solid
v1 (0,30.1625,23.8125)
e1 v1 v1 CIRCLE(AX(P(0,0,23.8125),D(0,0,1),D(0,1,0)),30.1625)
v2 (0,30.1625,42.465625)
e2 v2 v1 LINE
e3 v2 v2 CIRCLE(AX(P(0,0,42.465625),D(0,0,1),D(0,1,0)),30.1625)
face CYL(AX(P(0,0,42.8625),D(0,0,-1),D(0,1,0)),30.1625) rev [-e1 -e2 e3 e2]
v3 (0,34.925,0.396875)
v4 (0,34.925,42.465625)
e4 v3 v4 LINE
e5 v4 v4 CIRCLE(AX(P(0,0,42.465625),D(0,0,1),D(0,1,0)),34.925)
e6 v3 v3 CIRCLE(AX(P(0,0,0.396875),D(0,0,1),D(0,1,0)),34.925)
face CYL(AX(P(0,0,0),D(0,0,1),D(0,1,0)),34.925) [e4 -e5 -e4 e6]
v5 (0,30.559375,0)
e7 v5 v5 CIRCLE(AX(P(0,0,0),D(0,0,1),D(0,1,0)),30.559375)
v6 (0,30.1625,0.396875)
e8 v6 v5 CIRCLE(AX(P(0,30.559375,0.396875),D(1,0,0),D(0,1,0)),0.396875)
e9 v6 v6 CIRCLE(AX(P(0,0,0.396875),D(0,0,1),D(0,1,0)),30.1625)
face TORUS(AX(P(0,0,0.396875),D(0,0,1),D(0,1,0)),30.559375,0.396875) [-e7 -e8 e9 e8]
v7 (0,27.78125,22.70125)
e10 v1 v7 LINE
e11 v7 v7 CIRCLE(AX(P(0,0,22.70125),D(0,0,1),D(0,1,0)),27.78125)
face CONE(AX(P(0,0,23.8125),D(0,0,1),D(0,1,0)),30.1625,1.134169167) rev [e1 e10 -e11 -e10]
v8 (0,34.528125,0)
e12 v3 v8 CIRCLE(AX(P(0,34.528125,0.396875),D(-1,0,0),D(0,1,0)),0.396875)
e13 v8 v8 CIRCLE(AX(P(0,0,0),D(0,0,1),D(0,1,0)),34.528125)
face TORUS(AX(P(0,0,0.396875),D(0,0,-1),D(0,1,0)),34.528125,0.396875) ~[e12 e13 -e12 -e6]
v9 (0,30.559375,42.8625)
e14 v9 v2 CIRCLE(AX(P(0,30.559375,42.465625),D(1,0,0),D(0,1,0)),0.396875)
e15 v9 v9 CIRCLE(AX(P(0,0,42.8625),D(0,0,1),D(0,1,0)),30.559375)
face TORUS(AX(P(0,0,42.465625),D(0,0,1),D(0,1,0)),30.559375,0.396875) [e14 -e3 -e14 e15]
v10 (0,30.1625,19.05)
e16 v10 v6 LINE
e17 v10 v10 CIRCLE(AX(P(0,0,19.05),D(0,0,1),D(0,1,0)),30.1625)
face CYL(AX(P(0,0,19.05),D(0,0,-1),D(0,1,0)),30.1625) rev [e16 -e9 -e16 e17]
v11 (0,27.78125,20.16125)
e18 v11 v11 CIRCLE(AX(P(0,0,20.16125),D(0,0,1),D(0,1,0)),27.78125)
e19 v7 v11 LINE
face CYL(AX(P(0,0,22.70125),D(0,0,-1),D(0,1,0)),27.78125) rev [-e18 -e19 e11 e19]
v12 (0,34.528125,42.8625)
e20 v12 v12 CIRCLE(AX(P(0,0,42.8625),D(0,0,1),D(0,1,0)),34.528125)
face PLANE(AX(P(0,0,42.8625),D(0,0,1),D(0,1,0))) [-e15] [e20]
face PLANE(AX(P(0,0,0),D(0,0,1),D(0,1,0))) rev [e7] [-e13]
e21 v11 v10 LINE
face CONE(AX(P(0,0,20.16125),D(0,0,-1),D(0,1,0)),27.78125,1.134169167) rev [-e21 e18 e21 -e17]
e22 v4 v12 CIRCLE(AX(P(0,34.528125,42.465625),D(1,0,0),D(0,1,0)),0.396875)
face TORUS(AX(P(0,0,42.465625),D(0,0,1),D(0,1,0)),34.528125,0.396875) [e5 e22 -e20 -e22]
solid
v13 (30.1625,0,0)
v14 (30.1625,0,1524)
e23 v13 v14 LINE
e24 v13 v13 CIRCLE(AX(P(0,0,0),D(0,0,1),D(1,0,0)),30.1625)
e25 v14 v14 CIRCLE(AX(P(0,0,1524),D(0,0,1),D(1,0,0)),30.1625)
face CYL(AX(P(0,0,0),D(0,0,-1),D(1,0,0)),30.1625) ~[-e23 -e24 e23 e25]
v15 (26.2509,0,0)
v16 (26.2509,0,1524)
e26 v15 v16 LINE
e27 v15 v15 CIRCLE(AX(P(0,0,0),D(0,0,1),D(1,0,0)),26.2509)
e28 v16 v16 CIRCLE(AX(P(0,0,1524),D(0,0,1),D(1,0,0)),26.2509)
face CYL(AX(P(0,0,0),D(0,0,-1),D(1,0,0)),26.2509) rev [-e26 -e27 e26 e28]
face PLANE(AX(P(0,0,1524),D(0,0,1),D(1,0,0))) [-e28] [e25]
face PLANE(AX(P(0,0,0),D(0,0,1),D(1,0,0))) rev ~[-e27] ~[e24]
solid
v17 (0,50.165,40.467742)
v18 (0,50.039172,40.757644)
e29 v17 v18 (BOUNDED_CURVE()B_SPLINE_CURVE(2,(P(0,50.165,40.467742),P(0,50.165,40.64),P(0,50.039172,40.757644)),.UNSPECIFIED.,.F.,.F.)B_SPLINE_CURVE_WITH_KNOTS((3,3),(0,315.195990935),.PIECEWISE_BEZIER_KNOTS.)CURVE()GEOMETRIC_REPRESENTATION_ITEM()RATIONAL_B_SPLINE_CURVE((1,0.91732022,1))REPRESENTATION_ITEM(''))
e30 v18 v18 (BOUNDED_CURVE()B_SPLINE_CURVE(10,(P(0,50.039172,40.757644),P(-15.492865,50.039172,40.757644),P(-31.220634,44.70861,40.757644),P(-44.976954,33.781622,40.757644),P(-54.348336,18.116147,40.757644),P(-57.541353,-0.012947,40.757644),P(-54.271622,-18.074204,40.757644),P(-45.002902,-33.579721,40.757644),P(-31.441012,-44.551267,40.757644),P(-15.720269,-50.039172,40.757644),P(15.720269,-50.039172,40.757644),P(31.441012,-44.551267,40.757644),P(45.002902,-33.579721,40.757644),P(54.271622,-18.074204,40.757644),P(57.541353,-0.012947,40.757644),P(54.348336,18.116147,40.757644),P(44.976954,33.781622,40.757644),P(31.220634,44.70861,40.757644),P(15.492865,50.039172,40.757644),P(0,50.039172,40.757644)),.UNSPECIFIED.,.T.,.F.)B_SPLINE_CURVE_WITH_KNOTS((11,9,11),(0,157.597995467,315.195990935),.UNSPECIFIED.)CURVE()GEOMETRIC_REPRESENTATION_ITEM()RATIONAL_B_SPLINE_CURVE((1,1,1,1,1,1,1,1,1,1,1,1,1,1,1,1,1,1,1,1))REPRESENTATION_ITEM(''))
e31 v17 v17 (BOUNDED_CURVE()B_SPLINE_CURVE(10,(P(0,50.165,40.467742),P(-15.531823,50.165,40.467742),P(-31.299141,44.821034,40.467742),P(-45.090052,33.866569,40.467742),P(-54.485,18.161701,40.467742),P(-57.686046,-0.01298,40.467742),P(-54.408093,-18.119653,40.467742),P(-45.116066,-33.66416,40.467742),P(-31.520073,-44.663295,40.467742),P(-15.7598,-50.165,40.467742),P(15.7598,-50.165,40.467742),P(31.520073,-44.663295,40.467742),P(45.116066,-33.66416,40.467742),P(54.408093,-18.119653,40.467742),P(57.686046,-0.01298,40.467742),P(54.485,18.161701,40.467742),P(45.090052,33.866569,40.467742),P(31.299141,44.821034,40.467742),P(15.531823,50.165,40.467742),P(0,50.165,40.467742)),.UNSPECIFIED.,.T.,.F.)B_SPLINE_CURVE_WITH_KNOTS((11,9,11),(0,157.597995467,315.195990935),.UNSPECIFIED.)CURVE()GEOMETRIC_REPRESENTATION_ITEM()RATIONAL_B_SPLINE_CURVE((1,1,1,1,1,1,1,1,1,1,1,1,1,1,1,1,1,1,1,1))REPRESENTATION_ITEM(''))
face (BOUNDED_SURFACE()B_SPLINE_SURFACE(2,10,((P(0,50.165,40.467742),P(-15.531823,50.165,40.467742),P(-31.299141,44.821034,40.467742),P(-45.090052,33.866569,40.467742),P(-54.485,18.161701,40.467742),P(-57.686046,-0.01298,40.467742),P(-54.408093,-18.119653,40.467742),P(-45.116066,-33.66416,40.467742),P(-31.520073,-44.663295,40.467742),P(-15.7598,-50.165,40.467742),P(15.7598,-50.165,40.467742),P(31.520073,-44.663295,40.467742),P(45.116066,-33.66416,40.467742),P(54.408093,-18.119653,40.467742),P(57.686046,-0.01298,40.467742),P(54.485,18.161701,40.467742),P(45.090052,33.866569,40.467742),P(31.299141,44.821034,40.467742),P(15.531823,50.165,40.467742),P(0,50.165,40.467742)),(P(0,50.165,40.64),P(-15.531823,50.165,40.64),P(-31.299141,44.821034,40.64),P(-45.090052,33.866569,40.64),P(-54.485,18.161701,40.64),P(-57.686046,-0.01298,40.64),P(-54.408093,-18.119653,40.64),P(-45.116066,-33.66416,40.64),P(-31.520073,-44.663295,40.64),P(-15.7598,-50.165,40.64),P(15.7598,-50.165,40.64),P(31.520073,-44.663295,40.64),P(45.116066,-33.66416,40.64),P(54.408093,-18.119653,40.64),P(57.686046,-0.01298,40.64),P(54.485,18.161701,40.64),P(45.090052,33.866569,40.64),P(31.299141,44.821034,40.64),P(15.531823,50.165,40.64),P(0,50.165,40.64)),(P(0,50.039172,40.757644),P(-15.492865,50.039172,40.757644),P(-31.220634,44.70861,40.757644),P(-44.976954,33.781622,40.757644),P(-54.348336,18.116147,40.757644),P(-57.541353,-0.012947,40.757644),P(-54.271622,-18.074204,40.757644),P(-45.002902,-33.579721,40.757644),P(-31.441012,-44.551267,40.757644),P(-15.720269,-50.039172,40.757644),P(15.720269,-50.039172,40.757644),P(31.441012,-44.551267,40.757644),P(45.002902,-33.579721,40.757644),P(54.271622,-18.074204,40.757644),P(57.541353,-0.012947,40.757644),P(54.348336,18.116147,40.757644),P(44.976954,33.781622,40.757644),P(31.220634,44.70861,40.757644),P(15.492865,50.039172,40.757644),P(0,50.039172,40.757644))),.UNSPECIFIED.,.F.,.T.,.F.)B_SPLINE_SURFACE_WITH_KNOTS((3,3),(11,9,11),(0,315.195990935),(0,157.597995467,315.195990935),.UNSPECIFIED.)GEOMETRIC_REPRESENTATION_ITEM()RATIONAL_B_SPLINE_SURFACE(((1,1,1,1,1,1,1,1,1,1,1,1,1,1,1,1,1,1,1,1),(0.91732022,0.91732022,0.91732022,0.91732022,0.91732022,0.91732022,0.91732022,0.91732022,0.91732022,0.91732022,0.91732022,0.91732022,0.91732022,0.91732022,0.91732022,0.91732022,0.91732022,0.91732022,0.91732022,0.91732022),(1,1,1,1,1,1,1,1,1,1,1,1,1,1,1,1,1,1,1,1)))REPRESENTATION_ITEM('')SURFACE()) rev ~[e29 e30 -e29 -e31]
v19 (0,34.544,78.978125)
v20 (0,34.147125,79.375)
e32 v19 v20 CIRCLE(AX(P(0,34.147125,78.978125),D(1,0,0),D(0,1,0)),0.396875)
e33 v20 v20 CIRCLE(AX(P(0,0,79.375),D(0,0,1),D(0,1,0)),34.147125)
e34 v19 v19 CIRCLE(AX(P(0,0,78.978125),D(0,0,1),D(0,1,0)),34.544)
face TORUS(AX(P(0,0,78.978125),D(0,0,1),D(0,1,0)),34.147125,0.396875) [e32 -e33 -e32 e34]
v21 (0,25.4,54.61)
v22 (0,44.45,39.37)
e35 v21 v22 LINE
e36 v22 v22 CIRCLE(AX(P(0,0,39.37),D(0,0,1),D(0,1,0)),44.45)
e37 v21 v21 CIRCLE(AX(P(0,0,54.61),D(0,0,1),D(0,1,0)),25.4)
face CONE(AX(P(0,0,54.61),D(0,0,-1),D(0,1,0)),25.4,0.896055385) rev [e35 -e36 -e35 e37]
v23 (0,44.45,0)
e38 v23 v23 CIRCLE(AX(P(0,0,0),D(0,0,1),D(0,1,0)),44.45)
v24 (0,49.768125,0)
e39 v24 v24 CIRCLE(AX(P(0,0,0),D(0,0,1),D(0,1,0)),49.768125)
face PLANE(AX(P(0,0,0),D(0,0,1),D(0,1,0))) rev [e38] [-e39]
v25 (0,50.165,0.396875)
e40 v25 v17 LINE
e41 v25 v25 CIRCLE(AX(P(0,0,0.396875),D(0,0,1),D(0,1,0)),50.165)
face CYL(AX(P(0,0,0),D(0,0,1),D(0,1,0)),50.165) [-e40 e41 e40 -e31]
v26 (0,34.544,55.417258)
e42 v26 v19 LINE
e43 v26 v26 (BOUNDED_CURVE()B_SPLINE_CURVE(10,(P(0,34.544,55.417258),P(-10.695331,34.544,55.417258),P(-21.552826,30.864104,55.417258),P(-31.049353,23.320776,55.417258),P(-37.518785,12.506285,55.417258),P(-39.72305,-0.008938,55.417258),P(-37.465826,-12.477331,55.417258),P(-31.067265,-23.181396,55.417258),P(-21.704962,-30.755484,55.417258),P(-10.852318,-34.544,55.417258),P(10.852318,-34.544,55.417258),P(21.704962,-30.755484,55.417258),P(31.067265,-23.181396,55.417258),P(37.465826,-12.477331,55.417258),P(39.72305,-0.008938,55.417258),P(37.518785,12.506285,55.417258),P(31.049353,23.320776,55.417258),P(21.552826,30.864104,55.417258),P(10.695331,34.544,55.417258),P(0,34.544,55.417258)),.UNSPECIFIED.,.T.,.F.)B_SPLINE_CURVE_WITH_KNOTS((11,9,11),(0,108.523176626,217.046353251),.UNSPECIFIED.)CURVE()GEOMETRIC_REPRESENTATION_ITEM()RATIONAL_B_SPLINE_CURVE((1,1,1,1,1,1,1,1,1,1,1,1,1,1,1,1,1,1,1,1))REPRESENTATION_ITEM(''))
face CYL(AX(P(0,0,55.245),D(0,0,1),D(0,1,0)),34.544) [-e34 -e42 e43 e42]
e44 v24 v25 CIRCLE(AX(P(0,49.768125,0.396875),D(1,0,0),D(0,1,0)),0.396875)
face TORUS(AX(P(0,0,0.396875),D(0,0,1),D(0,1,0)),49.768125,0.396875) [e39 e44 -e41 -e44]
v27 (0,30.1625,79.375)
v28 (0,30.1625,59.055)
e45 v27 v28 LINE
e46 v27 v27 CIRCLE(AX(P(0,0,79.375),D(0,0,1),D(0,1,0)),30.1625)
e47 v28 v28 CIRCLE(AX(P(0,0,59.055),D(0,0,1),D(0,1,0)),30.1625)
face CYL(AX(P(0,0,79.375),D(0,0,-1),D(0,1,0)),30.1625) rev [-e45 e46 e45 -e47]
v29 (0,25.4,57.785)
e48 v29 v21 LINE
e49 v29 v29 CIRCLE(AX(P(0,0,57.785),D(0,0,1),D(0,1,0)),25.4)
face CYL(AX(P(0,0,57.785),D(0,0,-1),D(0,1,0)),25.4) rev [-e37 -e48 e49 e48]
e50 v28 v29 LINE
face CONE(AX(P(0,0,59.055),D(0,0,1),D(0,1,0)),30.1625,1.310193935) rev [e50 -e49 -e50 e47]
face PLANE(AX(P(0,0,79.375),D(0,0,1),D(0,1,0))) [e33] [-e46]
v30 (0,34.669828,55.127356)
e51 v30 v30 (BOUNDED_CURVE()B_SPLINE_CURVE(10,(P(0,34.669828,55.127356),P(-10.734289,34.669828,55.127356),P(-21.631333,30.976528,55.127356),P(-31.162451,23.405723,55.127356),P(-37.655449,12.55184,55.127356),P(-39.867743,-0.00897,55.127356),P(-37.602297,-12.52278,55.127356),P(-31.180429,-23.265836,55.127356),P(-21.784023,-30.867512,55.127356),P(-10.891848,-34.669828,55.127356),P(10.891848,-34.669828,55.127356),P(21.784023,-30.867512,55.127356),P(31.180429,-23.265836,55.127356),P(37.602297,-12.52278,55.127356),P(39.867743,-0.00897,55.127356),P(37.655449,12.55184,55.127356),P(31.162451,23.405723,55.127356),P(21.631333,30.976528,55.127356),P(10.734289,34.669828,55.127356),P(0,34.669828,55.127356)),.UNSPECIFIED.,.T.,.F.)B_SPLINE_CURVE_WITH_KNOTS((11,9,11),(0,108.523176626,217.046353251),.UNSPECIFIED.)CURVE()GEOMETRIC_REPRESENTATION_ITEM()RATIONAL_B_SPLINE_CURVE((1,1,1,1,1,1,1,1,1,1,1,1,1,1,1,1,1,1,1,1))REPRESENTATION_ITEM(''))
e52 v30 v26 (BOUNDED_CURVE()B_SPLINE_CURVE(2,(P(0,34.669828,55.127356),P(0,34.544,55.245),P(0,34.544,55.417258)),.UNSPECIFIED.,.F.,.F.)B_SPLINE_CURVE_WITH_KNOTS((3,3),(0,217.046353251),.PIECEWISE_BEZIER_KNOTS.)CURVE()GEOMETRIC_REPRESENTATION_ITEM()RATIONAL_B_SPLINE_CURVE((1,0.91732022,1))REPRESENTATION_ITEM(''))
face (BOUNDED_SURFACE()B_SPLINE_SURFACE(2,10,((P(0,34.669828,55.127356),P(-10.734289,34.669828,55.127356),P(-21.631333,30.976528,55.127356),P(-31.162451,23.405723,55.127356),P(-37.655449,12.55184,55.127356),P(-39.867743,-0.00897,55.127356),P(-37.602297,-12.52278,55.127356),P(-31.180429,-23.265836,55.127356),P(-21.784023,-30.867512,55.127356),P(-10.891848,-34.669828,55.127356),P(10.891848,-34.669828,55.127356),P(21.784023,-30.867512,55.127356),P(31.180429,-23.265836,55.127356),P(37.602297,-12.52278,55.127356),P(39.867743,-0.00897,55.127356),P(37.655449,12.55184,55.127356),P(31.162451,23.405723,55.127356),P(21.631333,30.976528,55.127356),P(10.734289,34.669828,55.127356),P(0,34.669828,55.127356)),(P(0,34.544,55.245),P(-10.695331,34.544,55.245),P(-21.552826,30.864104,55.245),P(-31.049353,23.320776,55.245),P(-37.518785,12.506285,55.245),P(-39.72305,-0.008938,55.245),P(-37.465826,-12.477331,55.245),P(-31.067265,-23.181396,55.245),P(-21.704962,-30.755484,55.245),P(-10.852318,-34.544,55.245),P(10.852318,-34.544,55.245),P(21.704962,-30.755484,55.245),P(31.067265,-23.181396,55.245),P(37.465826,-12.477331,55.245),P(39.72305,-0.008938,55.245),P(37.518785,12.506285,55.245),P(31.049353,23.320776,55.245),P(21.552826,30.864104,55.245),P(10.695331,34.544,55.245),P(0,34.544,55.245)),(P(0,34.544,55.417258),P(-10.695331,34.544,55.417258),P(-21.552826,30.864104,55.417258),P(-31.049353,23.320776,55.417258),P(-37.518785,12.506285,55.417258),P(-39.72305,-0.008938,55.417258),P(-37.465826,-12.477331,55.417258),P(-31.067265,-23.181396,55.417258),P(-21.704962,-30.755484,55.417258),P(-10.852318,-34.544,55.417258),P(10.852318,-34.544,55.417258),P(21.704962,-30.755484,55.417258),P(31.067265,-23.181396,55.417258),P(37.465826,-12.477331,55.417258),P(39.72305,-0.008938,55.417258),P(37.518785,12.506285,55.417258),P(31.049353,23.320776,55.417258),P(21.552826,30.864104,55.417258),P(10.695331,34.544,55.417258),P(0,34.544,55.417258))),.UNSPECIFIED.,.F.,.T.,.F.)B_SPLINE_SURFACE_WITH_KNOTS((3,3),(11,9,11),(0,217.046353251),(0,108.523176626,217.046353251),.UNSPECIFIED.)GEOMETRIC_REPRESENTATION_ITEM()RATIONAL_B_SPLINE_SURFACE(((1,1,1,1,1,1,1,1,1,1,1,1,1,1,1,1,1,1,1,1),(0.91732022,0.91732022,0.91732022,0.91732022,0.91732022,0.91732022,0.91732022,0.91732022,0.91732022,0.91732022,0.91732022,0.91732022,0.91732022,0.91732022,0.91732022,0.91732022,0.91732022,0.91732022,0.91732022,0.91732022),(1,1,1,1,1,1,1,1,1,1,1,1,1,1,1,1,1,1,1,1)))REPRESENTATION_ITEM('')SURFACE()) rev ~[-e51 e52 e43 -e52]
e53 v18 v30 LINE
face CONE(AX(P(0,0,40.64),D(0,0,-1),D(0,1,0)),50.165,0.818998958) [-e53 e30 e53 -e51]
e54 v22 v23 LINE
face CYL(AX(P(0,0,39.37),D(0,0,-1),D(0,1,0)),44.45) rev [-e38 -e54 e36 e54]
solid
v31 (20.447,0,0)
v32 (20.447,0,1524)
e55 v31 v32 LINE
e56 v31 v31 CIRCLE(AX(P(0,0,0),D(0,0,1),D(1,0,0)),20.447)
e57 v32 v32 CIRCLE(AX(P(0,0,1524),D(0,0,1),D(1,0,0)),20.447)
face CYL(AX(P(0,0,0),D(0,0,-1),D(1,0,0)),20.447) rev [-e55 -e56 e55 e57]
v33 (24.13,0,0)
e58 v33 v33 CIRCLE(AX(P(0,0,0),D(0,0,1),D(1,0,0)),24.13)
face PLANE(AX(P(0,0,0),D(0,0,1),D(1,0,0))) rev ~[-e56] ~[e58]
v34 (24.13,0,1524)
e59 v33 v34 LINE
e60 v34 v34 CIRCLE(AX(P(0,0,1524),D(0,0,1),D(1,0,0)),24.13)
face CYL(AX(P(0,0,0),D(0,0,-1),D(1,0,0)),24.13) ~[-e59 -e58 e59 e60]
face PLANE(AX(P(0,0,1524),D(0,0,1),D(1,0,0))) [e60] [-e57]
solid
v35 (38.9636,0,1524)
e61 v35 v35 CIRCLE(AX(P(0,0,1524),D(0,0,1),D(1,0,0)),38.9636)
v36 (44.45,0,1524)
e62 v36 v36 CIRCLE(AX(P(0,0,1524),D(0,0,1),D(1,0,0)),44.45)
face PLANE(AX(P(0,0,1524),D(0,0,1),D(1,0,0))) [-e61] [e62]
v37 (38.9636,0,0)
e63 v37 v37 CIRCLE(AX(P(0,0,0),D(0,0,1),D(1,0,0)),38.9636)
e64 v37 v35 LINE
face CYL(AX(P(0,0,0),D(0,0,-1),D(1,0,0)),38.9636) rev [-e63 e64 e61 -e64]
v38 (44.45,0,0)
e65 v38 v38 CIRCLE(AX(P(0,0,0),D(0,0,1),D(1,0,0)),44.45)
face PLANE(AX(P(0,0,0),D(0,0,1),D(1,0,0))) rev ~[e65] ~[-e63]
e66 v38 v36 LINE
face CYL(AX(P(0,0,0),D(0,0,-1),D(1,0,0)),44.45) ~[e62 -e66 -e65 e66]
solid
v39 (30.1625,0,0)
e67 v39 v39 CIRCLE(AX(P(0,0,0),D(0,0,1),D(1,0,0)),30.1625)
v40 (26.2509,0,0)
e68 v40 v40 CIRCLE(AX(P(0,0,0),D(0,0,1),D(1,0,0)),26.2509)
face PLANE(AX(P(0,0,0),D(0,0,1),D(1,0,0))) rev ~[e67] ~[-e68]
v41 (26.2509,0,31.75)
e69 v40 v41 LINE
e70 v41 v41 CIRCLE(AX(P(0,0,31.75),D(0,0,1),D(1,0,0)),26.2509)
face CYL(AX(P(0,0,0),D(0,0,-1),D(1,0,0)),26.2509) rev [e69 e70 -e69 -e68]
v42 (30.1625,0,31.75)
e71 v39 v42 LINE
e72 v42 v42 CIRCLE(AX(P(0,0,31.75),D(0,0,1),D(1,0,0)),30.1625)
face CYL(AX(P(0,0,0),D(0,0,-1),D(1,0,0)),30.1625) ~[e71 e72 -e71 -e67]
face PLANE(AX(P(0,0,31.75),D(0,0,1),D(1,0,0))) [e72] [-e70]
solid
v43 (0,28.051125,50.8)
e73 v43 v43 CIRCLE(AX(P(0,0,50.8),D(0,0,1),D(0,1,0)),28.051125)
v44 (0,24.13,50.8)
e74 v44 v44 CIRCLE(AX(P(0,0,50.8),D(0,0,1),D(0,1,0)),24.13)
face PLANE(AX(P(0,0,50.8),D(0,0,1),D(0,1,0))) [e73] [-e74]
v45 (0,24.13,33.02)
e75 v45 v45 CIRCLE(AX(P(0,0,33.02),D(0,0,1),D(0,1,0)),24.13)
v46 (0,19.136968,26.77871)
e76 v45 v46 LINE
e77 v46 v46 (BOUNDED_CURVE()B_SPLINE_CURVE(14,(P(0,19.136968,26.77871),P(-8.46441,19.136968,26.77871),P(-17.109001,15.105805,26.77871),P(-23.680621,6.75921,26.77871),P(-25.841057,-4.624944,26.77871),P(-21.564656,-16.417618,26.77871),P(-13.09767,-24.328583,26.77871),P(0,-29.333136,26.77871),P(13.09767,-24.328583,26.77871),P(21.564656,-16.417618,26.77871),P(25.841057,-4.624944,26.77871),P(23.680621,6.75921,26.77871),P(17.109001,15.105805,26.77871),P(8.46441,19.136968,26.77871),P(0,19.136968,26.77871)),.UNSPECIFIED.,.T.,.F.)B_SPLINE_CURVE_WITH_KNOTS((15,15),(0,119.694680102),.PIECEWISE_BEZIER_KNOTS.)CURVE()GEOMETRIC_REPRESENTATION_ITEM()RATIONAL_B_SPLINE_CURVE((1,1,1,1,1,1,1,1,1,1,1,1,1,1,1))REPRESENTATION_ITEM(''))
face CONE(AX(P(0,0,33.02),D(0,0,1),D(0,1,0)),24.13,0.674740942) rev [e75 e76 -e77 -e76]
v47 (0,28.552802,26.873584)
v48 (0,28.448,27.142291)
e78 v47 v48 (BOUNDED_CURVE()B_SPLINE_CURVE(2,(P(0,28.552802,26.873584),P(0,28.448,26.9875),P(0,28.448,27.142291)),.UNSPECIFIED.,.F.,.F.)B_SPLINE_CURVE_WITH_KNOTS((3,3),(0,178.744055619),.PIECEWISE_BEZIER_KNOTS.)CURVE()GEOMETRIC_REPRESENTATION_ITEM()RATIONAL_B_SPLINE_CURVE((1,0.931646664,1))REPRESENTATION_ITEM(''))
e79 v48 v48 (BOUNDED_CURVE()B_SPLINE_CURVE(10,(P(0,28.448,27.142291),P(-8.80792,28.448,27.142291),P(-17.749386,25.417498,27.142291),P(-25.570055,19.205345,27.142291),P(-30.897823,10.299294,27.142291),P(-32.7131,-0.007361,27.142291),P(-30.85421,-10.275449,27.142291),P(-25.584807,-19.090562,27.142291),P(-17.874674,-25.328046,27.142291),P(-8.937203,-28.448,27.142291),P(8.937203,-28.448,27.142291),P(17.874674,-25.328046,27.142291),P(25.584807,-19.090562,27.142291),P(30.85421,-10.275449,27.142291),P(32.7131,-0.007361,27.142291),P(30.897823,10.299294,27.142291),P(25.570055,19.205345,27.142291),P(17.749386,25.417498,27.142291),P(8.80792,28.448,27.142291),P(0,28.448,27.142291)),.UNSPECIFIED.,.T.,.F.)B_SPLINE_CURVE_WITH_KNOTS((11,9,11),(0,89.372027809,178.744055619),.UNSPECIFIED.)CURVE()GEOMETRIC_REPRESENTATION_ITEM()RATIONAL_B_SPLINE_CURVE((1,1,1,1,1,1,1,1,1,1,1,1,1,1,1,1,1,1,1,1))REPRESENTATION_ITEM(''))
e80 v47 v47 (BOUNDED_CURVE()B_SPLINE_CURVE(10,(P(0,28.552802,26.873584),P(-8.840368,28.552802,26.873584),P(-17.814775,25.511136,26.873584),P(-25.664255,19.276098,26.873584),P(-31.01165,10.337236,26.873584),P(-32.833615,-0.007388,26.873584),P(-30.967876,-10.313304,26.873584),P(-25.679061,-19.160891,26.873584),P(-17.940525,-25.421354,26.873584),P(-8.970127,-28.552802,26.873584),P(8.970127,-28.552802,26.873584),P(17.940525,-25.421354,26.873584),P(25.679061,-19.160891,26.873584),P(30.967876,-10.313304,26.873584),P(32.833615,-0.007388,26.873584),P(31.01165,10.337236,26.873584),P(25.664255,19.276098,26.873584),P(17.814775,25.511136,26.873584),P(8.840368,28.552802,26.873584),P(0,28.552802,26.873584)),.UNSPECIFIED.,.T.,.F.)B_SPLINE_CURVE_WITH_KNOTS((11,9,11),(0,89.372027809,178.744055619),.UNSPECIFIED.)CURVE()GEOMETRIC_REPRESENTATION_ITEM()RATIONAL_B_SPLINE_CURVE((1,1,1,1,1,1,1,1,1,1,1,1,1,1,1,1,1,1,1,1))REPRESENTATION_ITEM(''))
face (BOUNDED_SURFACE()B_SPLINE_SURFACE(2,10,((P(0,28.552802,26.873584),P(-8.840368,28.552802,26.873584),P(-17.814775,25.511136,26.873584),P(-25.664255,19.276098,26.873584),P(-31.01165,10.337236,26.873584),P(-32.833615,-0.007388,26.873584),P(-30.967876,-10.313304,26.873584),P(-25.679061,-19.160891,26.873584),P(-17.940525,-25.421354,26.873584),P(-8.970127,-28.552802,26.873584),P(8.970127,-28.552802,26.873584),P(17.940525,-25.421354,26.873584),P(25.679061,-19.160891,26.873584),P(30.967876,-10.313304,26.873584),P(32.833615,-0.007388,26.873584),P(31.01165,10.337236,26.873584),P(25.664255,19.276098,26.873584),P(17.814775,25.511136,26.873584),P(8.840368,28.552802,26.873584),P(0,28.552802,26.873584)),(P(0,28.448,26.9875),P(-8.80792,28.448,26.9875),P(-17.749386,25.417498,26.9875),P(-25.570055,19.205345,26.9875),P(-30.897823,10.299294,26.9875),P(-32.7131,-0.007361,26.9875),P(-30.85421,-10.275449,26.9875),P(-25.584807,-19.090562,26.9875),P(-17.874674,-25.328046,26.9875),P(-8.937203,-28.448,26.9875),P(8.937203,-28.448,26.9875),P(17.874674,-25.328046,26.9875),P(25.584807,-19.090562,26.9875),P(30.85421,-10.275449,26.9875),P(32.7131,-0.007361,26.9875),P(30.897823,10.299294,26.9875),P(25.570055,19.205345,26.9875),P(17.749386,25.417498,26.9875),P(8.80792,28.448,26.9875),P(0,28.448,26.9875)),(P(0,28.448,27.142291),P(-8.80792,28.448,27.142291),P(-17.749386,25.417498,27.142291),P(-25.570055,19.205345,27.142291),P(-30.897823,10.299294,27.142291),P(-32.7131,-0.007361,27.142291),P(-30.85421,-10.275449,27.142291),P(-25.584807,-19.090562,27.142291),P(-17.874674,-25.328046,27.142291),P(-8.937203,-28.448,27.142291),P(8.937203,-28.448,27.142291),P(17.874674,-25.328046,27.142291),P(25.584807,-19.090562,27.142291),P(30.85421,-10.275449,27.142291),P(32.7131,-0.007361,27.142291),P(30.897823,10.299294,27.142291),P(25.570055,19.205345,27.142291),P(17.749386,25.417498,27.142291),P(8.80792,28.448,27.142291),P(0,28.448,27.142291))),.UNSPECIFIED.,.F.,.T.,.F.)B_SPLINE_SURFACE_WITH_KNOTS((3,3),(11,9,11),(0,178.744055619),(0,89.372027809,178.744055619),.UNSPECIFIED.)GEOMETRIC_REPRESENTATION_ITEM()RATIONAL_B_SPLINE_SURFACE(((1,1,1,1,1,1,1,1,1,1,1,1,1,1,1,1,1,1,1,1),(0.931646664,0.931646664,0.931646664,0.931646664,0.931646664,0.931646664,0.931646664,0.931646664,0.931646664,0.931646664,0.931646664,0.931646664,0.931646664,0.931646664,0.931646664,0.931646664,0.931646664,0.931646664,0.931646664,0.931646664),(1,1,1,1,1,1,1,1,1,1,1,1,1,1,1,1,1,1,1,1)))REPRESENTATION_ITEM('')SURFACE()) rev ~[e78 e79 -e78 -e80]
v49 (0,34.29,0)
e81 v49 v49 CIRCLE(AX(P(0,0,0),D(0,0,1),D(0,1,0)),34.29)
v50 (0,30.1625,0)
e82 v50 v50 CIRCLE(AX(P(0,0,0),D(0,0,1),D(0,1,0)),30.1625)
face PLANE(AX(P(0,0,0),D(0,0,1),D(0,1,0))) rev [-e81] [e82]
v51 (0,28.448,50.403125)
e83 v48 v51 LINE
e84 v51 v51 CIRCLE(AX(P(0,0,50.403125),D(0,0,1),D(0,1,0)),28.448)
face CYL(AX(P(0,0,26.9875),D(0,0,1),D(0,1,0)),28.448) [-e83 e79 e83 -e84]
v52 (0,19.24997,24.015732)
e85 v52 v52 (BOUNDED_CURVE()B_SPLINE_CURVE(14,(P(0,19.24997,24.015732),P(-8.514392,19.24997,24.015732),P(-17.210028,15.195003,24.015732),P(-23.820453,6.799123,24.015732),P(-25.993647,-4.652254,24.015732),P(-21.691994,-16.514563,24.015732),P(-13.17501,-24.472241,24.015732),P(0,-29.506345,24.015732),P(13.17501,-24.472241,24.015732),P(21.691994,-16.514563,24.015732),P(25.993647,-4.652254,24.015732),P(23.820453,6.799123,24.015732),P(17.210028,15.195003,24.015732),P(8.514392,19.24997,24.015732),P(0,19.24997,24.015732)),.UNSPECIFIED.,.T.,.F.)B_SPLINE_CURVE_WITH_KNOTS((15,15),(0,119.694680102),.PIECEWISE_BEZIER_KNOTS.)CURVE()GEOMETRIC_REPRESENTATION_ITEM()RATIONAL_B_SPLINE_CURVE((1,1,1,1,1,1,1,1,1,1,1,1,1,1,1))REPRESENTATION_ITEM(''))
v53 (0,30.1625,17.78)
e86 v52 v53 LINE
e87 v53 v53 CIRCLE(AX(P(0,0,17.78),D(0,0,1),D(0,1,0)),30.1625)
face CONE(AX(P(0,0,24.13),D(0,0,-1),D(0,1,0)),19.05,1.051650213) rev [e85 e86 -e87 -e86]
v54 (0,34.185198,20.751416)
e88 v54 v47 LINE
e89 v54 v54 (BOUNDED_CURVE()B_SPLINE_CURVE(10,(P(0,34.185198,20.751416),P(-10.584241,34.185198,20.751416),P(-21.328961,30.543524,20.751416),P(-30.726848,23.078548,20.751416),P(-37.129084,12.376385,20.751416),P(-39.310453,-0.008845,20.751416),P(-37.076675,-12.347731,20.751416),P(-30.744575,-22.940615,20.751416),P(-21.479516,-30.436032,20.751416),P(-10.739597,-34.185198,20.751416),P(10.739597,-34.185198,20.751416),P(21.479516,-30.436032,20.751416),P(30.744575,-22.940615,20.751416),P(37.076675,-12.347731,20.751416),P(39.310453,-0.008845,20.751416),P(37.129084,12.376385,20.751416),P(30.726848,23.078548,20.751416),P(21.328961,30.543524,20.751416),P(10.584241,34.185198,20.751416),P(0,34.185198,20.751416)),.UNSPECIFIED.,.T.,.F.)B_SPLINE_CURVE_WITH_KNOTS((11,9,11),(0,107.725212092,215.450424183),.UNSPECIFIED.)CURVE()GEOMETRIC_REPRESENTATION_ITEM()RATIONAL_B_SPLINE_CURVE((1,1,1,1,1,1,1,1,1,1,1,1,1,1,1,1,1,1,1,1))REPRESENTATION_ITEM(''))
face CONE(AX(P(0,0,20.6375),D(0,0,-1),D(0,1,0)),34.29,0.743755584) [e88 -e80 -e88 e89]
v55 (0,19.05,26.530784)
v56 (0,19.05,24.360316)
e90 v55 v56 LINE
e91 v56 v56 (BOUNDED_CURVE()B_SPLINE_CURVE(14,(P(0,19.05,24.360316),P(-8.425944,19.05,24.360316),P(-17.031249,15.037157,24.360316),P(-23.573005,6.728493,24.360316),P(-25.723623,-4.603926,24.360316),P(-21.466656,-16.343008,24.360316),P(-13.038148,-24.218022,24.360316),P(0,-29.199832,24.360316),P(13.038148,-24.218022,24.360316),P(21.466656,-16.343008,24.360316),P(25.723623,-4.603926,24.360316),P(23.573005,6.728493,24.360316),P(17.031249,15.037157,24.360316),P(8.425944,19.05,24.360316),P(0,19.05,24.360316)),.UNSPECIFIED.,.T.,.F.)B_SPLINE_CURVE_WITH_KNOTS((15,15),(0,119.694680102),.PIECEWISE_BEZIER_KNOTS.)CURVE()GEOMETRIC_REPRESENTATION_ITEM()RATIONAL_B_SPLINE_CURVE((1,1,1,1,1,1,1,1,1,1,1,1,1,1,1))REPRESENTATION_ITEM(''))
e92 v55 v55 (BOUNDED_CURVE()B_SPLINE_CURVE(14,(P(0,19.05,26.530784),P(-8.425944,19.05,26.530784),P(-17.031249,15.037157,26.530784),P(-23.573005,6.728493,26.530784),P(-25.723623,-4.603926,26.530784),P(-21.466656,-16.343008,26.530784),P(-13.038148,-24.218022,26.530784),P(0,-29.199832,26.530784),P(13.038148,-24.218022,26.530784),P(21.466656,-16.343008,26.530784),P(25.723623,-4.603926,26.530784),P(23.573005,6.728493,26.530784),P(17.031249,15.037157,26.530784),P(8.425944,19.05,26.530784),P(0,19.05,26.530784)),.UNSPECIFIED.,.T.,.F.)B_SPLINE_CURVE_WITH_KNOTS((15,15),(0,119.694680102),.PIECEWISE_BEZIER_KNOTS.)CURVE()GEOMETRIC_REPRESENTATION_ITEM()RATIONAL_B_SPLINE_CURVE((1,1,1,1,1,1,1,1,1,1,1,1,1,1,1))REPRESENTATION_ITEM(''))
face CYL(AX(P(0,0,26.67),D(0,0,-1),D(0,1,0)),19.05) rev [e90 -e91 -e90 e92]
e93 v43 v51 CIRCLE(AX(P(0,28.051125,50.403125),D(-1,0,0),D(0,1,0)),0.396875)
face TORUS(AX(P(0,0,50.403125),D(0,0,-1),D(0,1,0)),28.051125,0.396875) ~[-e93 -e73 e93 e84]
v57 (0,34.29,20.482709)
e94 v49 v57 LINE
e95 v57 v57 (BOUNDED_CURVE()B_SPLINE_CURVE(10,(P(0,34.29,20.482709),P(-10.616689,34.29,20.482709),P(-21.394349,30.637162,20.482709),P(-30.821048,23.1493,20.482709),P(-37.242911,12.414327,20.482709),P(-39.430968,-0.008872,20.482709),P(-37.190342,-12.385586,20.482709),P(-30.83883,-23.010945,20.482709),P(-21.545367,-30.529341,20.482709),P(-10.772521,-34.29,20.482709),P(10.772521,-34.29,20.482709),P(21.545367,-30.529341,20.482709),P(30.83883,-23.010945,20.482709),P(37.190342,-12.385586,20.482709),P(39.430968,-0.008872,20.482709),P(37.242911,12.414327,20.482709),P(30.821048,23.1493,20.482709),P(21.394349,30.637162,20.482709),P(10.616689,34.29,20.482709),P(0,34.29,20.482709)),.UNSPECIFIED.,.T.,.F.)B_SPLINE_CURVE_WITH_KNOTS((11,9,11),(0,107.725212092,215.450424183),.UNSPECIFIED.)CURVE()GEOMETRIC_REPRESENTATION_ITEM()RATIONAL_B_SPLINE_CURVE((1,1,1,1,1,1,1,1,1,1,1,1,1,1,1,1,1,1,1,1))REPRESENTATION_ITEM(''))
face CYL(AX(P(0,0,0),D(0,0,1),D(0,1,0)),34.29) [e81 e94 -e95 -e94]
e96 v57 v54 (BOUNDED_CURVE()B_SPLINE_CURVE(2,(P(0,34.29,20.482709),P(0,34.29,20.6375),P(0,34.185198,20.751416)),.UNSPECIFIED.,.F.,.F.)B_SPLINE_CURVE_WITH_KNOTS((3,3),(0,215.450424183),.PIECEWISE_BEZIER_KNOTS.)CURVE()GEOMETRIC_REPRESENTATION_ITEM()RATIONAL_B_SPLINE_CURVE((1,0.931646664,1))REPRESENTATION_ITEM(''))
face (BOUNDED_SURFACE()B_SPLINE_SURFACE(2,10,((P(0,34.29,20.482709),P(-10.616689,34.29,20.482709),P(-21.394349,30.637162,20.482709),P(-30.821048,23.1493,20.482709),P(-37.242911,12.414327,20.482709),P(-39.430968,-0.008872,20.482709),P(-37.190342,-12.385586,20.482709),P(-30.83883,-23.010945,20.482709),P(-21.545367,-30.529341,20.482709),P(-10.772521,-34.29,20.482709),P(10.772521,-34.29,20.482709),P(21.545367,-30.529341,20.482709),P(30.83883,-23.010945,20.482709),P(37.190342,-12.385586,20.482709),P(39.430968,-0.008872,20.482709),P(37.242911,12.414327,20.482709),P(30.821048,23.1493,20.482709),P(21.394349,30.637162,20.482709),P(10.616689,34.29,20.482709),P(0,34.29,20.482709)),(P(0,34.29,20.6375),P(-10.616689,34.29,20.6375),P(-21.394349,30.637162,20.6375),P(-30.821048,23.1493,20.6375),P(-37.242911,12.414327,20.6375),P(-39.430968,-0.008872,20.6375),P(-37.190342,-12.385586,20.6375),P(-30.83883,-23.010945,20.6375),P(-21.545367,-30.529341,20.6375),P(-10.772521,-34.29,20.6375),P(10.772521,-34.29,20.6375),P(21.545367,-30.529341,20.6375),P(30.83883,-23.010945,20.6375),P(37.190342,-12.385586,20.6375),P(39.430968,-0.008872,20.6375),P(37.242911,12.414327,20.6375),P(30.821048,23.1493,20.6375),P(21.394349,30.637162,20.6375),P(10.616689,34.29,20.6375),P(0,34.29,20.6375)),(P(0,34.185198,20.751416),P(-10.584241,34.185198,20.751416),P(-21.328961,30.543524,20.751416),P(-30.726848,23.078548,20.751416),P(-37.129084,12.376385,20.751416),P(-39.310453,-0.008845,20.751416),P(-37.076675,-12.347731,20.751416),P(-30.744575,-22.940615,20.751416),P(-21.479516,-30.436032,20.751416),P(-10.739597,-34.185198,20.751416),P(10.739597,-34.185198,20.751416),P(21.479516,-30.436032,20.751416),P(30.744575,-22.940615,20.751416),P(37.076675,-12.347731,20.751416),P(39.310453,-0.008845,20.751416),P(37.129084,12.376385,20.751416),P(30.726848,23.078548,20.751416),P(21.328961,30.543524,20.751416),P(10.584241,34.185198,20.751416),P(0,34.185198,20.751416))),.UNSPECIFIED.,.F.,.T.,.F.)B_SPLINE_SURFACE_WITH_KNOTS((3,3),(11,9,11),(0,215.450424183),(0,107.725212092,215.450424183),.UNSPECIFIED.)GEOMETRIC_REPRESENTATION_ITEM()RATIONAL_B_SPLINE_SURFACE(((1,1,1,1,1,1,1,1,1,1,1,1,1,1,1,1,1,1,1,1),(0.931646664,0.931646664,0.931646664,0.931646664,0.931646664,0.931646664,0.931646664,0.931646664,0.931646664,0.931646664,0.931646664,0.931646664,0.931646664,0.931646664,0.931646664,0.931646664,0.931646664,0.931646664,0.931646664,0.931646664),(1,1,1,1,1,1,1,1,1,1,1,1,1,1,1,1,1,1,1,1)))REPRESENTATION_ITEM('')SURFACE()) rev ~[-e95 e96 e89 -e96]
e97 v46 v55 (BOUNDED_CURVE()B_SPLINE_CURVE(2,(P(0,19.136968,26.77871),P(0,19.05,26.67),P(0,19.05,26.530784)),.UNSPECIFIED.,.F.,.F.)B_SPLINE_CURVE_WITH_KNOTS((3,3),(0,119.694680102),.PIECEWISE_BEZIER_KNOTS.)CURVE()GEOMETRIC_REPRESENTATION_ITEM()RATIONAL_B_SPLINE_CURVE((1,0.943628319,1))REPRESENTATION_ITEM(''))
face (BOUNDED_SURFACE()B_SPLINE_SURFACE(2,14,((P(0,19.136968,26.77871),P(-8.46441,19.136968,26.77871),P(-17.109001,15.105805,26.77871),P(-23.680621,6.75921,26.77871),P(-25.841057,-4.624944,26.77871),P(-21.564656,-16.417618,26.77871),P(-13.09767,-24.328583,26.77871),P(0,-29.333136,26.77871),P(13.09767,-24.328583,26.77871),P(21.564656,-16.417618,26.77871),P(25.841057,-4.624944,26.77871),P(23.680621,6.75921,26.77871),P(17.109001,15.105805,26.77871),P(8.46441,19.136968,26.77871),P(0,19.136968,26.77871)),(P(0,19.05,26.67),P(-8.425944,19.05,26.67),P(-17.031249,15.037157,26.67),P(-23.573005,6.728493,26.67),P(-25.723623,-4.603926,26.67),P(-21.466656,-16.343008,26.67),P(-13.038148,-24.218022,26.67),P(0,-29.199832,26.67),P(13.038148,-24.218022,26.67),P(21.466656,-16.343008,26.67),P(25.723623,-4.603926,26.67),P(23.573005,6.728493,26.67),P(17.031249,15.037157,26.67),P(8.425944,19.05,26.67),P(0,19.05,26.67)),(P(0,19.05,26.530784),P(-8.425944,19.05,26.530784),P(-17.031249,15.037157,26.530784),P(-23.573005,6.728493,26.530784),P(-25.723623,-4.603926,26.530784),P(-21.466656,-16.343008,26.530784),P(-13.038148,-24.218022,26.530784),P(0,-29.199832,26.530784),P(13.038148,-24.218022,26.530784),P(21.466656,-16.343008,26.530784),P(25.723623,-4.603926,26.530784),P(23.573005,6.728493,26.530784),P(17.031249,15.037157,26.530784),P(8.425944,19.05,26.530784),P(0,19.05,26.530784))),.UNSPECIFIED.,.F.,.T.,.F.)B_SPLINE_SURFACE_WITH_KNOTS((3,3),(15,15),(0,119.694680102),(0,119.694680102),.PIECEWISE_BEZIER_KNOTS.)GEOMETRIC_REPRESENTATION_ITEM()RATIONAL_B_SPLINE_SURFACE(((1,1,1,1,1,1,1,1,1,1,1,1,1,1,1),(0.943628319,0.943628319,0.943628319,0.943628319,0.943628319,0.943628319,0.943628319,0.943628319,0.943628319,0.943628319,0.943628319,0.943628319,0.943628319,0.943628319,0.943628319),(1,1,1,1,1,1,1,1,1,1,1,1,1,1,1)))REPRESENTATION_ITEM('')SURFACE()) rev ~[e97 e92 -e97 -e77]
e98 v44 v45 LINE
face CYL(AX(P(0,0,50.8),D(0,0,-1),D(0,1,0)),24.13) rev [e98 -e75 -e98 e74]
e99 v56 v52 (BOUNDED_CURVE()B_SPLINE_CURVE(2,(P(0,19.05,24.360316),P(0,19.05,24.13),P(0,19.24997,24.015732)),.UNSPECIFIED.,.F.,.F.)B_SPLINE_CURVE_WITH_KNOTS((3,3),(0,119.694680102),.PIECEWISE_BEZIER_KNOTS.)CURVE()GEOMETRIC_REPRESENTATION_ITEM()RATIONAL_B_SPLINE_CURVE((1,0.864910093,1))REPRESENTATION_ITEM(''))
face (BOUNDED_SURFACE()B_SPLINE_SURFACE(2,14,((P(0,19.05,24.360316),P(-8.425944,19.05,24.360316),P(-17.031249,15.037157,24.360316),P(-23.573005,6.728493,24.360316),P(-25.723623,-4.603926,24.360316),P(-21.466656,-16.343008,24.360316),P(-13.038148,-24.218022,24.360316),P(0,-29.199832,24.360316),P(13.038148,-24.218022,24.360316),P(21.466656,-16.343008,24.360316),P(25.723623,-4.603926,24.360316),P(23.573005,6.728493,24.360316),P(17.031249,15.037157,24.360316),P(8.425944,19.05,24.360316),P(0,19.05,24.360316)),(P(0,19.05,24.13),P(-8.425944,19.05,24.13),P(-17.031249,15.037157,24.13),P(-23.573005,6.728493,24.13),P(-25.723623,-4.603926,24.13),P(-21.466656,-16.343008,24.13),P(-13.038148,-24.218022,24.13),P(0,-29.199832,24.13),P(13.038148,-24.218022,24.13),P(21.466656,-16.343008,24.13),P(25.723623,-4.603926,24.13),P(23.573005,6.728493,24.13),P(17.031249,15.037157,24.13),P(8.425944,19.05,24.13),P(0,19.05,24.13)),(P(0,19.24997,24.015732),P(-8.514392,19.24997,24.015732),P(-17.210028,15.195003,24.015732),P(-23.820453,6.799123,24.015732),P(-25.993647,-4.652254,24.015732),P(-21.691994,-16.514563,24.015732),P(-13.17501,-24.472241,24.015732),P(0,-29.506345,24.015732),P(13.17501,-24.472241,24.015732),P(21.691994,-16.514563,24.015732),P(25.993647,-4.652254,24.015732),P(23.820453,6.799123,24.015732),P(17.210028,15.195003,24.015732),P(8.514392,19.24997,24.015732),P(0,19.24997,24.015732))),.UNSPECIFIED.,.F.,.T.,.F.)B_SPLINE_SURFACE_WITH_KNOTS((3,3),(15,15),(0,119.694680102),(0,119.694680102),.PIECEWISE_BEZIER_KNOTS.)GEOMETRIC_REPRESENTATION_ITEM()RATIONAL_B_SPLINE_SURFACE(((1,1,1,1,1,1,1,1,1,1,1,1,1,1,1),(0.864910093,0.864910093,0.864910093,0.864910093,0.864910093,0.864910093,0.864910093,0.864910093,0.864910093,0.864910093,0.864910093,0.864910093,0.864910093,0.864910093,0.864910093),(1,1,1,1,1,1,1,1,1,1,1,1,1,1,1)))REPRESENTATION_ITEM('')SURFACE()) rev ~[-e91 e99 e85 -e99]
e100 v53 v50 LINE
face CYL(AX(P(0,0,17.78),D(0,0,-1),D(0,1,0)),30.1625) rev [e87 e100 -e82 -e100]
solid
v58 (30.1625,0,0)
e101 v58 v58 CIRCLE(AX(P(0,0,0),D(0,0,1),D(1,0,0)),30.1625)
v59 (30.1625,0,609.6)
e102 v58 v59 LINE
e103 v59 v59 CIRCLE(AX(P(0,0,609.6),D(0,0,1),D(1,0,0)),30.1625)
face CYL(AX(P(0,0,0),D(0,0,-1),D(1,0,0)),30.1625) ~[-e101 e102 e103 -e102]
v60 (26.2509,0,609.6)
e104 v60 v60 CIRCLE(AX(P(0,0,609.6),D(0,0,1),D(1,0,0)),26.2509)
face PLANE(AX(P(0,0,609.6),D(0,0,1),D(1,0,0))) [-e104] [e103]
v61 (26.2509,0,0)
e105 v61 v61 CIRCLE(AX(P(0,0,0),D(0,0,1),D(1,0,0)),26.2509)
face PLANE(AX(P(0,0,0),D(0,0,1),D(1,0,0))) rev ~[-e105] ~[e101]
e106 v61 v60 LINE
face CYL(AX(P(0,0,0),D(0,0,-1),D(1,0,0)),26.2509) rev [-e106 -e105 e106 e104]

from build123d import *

# Parameters (mm, degrees)
F0_R      = 24.13
F0_R_2    = 20.447
F1_DEPTH  = 1524
F2_R      = 30.1625
F2_R_2    = 26.2509
F3_DEPTH  = 1524
F4_R      = 44.45
F4_R_2    = 38.9636
F5_DEPTH  = 1524
F8_R      = 0.396875
F11_R     = 0.396875
F14_R     = 0.396875
F15_DEPTH = 609.6
F16_DEPTH = 31.75


# Not quite as in the source:
# - a feature of the source that left no trace in its solid (it failed there, or was rolled back) is left out


with BuildPart() as f1:
    # F0 (on Top) → F1 (new body)
    with BuildSketch(Plane.XY):
        Circle(F0_R)
        Circle(F0_R_2, mode=Mode.SUBTRACT)
    extrude(amount=F1_DEPTH)


with BuildPart() as f3:
    # F2 (on Top) → F3 (new body)
    with BuildSketch(Plane.XY):
        Circle(F2_R)
        Circle(F2_R_2, mode=Mode.SUBTRACT)
    extrude(amount=F3_DEPTH)


with BuildPart() as f5:
    # F4 (on Top) → F5 (new body)
    with BuildSketch(Plane.XY):
        Circle(F4_R)
        Circle(F4_R_2, mode=Mode.SUBTRACT)
    extrude(amount=F5_DEPTH)


with BuildPart() as f7:
    # F6 (on Right) → F7 (revolve)
    with BuildSketch(Plane.YZ):
        Polygon((28.448, 50.8), (24.13, 50.8), (24.13, 33.02), (19.05, 26.67), (19.05, 24.13), (30.1625, 17.78), (30.1625, 0), (34.29, 0), (34.29, 20.6375), (28.448, 26.9875), align=None)
    revolve(axis=Axis((0, 0, 47.6393419911), (0, 0, 1)))

    # F8
    f8_edges = [f7.edges().sort_by_distance(p)[0] for p in [
        (0, -28.448, 50.8),
        (0, -28.448, 26.9875),
        (0, -34.29, 20.6375),
        (0, -19.05, 24.13),
        (0, -19.05, 26.67),
    ]]
    fillet(f8_edges, radius=F8_R)


with BuildPart() as f10:
    # F9 (on Right) → F10 (revolve)
    with BuildSketch(Plane.YZ):
        Polygon((44.45, 39.37), (44.45, 0), (50.165, 0), (50.165, 40.64), (34.544, 55.245), (34.544, 79.375), (30.1625, 79.375), (30.1625, 59.055), (25.4, 57.785), (25.4, 54.61), align=None)
    revolve(axis=Axis((0, 0, 51.9358633666), (0, 0, 1)))

    # F11
    f11_edges = [f10.edges().sort_by_distance(p)[0] for p in [
        (0, -50.165, 0),
        (0, -50.165, 40.64),
        (0, -34.544, 55.245),
        (0, -34.544, 79.375),
    ]]
    fillet(f11_edges, radius=F11_R)


with BuildPart() as f13:
    # F12 (on Right) → F13 (revolve)
    with BuildSketch(Plane.YZ):
        Polygon((34.925, 0), (34.925, 42.8625), (30.1625, 42.8625), (30.1625, 23.8125), (27.78125, 22.70125), (27.78125, 20.16125), (30.1625, 19.05), (30.1625, 0), align=None)
    revolve(axis=Axis((0, 0, 23.4007398409), (0, 0, 1)))

    # F14
    f14_edges = [f13.edges().sort_by_distance(p)[0] for p in [
        (0, -30.1625, 42.8625),
        (0, -34.925, 42.8625),
        (0, -34.925, 0),
        (0, -30.1625, 0),
    ]]
    fillet(f14_edges, radius=F14_R)


with BuildPart() as f15:
    # F2 (on Top) → F15 (new body)
    with BuildSketch(Plane.XY):
        Circle(F2_R)
        Circle(F2_R_2, mode=Mode.SUBTRACT)
    extrude(amount=F15_DEPTH)


with BuildPart() as f16:
    # F2 (on Top) → F16 (new body)
    with BuildSketch(Plane.XY):
        Circle(F2_R)
        Circle(F2_R_2, mode=Mode.SUBTRACT)
    extrude(amount=F16_DEPTH)


solid = Compound([f1.part, f3.part, f5.part, f7.part, f10.part, f13.part, f15.part, f16.part])
